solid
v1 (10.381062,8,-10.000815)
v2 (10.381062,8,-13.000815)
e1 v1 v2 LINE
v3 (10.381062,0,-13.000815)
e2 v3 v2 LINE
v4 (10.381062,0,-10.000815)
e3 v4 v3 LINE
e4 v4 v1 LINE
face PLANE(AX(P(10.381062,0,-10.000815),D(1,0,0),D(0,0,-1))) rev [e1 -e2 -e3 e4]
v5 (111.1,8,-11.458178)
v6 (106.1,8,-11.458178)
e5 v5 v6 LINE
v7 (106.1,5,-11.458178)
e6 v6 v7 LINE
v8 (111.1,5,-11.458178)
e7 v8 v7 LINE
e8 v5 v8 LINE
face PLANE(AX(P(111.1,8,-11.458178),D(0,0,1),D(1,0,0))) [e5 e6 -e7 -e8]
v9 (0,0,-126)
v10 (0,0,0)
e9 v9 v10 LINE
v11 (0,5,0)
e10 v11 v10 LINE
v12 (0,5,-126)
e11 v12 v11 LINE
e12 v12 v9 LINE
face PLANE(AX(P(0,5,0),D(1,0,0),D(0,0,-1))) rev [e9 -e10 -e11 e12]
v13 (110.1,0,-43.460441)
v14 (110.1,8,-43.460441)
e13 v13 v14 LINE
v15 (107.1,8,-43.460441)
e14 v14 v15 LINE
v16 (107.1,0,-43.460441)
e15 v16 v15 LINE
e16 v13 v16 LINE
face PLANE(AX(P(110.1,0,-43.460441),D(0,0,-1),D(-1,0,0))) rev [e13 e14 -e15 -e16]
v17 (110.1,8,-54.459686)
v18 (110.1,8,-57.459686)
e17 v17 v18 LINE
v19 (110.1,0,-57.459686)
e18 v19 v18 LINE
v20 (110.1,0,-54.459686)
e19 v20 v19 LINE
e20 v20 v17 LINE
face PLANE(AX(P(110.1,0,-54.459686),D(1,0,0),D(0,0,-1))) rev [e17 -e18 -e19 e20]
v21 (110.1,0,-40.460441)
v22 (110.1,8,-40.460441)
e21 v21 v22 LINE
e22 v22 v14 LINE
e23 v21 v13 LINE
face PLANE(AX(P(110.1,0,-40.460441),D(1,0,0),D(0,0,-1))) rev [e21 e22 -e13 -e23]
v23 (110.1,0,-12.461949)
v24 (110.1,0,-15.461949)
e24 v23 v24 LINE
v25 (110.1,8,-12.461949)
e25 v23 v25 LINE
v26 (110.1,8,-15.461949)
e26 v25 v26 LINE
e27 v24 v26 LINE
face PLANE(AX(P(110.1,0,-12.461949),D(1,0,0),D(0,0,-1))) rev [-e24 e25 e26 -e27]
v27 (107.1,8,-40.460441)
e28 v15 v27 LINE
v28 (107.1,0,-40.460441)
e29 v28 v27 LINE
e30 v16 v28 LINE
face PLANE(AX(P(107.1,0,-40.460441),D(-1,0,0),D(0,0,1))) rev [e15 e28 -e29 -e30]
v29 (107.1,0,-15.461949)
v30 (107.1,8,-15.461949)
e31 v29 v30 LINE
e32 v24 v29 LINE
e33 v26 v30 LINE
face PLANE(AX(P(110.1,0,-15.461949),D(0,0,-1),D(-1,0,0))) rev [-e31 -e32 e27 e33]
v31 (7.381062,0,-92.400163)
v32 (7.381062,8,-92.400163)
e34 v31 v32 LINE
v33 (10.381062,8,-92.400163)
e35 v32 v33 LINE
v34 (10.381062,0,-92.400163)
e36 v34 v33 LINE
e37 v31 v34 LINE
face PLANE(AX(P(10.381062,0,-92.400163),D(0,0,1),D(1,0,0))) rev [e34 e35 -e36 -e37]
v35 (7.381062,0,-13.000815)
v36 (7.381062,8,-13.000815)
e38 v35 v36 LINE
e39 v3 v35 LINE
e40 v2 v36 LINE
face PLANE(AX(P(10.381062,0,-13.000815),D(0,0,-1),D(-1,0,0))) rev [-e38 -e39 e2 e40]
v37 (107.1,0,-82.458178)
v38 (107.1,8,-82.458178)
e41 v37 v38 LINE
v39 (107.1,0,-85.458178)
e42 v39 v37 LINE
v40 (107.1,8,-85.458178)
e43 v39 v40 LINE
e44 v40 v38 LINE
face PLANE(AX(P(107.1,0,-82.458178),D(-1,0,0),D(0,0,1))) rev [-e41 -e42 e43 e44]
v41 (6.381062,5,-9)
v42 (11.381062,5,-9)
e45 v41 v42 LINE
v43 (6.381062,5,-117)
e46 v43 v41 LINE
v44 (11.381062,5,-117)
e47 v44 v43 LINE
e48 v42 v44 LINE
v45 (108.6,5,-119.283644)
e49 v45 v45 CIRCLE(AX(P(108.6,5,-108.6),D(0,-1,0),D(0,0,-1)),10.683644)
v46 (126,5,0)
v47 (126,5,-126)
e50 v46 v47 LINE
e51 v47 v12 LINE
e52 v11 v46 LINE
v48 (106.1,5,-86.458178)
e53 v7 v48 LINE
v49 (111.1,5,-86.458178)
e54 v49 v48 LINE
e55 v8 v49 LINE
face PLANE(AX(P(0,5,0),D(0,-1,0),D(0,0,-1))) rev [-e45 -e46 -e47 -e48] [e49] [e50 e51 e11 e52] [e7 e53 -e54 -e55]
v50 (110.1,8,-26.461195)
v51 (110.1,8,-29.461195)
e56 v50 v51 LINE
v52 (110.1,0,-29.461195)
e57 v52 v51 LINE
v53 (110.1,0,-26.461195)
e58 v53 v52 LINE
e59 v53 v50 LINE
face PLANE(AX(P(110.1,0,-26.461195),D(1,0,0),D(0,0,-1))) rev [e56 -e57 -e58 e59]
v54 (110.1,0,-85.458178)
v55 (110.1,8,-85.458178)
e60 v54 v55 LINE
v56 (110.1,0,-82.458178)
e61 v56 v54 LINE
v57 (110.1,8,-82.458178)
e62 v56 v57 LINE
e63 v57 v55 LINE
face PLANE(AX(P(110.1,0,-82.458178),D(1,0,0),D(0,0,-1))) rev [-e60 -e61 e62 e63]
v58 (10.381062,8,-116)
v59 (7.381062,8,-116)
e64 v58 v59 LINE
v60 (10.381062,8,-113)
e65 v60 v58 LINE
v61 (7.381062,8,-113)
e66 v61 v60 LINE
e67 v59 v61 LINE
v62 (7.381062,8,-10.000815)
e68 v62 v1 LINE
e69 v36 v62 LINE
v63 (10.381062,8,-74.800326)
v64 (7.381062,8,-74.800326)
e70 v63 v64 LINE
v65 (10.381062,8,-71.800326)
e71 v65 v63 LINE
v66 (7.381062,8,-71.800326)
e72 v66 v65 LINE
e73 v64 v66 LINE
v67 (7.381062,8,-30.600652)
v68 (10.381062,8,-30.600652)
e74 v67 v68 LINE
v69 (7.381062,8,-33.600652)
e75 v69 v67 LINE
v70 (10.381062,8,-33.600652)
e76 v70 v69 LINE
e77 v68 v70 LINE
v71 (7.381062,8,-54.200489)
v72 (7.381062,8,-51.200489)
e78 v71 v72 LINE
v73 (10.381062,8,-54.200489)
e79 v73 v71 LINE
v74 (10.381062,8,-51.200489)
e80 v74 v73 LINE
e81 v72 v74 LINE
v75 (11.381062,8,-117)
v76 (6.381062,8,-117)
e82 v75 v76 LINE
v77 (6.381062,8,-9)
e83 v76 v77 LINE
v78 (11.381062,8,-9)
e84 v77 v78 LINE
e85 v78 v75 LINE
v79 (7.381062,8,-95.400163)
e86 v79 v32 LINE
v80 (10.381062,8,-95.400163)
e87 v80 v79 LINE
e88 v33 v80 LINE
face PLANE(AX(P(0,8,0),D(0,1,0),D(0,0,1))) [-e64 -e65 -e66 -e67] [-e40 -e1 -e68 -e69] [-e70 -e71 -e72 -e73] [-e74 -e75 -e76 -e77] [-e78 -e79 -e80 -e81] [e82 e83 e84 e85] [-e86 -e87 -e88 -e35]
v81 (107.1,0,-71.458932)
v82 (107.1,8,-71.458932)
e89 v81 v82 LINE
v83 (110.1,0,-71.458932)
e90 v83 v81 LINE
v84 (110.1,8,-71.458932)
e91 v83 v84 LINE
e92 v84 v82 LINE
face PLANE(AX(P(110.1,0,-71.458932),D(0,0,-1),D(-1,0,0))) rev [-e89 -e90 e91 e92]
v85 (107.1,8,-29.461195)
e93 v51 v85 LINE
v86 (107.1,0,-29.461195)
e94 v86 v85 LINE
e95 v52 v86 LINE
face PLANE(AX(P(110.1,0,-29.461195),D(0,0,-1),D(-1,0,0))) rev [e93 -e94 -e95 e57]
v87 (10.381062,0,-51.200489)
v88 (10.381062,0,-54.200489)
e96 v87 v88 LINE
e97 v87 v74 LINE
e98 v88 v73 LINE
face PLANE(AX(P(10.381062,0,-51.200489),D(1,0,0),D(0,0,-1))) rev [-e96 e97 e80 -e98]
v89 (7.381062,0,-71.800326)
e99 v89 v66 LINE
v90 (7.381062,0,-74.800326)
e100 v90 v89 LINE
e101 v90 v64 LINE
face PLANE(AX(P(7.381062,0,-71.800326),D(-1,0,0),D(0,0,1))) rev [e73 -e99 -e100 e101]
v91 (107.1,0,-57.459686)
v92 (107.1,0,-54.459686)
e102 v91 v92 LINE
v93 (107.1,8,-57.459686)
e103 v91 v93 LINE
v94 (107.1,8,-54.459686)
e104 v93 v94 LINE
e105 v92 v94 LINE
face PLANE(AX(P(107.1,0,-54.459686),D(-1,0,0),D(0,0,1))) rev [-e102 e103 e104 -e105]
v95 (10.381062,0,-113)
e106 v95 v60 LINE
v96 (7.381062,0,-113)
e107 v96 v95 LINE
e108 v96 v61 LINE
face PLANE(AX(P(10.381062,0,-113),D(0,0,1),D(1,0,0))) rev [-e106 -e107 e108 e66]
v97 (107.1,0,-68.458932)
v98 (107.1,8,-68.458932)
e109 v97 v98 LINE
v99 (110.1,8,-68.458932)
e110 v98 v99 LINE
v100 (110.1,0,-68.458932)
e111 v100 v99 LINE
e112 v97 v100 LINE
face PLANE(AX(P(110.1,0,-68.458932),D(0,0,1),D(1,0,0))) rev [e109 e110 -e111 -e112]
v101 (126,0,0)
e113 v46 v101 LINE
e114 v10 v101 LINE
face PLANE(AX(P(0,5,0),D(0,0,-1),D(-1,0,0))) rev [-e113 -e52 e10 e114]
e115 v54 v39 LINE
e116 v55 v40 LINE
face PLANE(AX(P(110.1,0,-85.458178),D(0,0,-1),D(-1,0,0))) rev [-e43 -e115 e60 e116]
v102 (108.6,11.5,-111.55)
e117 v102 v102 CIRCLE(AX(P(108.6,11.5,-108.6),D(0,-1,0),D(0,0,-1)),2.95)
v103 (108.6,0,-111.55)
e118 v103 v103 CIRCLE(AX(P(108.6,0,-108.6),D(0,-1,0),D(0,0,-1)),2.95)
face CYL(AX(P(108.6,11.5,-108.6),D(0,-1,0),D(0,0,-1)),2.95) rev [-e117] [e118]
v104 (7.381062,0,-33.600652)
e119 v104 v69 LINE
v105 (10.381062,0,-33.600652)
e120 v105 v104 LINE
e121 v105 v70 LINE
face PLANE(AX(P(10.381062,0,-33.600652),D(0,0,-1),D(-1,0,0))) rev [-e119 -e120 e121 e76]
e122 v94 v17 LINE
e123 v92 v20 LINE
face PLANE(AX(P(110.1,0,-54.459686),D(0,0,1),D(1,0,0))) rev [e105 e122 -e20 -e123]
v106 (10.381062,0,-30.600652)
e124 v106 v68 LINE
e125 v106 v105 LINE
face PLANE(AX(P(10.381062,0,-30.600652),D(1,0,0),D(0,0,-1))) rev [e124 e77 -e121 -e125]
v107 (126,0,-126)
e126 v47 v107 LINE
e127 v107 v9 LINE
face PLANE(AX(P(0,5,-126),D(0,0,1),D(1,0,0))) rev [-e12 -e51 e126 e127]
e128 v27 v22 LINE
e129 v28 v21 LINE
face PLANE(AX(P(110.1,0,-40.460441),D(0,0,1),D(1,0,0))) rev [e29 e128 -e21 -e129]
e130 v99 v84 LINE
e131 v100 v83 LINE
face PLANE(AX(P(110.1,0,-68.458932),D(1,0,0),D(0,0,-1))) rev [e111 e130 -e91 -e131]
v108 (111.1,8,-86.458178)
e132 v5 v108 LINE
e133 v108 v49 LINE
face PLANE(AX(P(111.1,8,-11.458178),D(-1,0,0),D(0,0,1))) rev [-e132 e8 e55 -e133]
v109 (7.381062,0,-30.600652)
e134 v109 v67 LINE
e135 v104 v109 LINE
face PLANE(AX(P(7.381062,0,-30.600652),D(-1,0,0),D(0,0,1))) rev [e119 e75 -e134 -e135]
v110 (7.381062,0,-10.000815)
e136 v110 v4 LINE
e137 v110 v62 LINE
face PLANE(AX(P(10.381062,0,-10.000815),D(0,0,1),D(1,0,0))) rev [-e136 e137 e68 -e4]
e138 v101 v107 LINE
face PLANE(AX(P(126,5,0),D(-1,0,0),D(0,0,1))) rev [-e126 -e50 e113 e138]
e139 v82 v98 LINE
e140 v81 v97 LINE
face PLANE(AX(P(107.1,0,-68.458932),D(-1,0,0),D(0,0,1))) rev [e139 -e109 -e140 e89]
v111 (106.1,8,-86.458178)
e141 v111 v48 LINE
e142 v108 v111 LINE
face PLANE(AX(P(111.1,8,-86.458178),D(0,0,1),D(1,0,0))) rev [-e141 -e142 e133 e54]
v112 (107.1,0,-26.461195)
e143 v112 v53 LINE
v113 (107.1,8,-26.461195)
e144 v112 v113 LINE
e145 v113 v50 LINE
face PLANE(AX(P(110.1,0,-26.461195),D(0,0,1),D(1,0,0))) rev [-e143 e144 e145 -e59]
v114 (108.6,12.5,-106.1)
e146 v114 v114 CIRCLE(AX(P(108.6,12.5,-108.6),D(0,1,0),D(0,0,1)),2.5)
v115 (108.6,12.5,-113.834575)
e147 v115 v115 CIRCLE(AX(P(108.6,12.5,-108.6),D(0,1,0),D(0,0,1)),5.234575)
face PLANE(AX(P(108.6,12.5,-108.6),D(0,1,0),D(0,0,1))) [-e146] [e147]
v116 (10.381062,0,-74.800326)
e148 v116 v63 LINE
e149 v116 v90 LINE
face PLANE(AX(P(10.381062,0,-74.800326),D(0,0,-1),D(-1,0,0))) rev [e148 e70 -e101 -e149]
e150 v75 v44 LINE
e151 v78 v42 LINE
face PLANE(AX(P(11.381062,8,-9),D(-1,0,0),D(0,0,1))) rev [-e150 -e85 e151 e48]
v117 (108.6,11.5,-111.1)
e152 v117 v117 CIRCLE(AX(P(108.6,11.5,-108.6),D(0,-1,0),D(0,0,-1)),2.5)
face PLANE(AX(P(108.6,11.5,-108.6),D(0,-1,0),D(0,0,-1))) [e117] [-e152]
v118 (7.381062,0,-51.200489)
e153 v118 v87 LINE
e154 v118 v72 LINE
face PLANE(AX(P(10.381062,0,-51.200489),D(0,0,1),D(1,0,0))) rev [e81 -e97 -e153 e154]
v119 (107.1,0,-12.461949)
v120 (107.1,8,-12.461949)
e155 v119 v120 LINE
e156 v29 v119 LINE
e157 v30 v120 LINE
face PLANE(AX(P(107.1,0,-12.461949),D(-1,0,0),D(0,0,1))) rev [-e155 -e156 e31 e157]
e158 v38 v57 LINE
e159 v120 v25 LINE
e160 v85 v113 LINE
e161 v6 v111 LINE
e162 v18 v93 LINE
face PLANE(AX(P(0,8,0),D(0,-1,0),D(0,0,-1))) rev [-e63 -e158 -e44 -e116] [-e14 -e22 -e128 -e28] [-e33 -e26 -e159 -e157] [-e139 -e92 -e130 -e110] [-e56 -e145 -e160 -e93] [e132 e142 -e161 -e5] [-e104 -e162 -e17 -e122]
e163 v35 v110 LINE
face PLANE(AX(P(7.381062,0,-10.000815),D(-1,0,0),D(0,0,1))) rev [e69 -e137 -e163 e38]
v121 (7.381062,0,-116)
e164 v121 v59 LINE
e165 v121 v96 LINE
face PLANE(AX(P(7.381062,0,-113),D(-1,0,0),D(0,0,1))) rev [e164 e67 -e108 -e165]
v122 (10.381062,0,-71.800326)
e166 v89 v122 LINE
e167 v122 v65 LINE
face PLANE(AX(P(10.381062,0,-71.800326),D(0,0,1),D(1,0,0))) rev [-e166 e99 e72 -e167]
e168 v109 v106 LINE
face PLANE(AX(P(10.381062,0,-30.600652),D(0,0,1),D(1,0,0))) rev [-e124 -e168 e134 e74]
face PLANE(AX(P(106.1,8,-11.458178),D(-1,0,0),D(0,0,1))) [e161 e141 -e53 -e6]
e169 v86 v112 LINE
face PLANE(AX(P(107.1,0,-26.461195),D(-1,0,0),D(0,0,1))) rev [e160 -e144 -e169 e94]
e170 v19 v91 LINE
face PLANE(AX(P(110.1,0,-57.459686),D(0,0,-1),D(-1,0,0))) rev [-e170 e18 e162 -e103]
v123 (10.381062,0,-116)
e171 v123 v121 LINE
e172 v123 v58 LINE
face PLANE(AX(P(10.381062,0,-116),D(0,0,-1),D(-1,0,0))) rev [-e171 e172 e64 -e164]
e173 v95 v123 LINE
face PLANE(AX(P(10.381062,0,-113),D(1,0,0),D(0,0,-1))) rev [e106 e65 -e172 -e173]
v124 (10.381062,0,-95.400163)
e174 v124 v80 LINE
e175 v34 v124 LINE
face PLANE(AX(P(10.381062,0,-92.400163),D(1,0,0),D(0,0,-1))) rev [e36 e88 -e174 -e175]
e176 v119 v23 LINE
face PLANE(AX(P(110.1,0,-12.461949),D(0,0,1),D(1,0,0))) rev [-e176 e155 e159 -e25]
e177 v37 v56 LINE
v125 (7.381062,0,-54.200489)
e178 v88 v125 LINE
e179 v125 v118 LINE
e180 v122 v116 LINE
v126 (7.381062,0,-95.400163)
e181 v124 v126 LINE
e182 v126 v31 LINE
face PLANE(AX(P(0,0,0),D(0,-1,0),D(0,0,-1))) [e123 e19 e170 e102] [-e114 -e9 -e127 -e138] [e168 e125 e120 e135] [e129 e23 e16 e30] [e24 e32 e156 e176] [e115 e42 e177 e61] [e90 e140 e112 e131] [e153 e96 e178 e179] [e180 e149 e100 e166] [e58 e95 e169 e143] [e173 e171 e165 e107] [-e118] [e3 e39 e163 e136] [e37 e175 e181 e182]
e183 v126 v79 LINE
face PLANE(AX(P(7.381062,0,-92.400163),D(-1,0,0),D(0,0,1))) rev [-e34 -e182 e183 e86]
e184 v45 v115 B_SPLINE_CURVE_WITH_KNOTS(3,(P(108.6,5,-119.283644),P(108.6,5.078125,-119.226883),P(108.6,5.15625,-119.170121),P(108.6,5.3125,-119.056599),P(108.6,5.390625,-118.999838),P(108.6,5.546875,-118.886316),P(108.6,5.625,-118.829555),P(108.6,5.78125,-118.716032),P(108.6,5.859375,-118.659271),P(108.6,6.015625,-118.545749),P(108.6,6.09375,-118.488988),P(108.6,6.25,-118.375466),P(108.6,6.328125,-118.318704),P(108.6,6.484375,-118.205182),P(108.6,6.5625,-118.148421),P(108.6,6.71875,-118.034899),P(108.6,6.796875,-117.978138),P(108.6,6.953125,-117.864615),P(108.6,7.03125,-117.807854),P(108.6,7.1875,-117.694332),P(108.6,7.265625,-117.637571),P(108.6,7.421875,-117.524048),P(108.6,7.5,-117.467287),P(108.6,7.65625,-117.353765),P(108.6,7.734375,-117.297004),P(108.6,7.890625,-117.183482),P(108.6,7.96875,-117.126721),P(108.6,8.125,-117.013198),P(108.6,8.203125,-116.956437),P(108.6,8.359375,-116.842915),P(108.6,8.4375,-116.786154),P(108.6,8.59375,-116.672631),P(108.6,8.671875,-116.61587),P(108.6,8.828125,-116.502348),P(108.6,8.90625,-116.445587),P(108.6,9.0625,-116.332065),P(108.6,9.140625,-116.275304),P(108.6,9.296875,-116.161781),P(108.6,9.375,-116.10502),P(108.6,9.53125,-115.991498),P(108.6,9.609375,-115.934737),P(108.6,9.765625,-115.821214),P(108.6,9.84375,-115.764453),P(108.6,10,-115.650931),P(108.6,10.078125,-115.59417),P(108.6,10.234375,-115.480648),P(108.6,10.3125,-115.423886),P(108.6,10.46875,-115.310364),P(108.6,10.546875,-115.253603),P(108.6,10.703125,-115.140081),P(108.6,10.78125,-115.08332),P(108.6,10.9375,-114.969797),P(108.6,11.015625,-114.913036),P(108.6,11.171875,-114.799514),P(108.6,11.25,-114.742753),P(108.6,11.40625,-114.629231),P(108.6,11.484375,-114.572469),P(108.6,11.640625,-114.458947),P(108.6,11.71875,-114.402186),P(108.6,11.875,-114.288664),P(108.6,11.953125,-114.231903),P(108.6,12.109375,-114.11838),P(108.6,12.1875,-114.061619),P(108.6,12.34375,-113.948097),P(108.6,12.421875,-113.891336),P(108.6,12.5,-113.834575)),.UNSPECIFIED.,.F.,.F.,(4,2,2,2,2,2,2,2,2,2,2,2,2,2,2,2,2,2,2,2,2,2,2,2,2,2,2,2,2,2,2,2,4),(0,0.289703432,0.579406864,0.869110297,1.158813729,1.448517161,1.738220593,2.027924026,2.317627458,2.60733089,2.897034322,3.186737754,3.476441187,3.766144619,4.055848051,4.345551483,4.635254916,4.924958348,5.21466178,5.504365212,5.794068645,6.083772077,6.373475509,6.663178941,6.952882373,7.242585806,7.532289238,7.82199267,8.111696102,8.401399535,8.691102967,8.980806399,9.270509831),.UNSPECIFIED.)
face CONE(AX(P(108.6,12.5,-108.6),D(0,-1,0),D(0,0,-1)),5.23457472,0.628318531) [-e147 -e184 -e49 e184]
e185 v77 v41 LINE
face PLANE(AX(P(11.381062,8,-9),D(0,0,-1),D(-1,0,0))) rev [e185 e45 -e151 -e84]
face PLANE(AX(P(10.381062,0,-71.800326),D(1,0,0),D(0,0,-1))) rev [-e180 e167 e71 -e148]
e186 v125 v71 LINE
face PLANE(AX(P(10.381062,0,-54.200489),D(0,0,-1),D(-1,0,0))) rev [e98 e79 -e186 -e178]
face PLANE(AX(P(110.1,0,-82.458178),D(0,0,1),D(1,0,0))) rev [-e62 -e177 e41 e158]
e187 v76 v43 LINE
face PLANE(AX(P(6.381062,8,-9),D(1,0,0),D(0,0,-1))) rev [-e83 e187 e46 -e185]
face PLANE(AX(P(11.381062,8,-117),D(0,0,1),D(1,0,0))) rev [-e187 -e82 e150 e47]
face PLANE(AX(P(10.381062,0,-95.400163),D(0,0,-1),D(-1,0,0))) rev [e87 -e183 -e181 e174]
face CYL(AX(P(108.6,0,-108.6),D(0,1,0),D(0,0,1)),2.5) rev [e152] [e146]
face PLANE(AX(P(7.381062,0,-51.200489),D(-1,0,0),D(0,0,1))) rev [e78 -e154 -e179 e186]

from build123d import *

# Parameters (mm, degrees)
SKETCH1_W           = 126
SKETCH1_H           = 126
BOSS_EXTRUDE1_DEPTH = 5
SKETCH3_R           = 12.5
BOSS_EXTRUDE2_DEPTH = 7.5
SKETCH4_R           = 2.95
CUT_EXTRUDE1_DEPTH  = 11.5
SKETCH6_R           = 2.5
CUT_EXTRUDE2_DEPTH  = 179.628805068
CHAMFER1_SIZE       = 10
CHAMFER1_SIZE_2     = 7.26542528
SKETCH9_W           = 5
SKETCH9_H           = 75
BOSS_EXTRUDE4_DEPTH = 3
SKETCH10_W          = 3
SKETCH10_H          = 3
CUT_EXTRUDE4_DEPTH  = 179.370401132
SKETCH11_W          = 5
SKETCH11_H          = 108
BOSS_EXTRUDE5_DEPTH = 3
SKETCH12_W          = 3
SKETCH12_H          = 3
CUT_EXTRUDE5_DEPTH  = 179.370401132


with BuildPart() as part:
    # Sketch1 → Boss-Extrude1 (new body)
    with BuildSketch(Plane(origin=(0, 0, 0), x_dir=(1, 0, 0), z_dir=(0, 1, 0))):
        with Locations((63, 63)):
            Rectangle(SKETCH1_W, SKETCH1_H)
    extrude(amount=BOSS_EXTRUDE1_DEPTH)

    # Sketch3 → Boss-Extrude2 (add)
    with BuildSketch(Plane(origin=(0, 5, 0), x_dir=(1, 0, 0), z_dir=(0, 1, 0))):
        with Locations(Location((108.6, 108.6, 0), (0, 0, 90))):
            Circle(SKETCH3_R)
    extrude(amount=BOSS_EXTRUDE2_DEPTH)

    # Sketch4 → Cut-Extrude1 (cut)
    with BuildSketch(Plane.XZ):
        with Locations(Location((108.6, -108.6, 0), (0, 0, 270))):
            Circle(SKETCH4_R)
    extrude(amount=-CUT_EXTRUDE1_DEPTH, mode=Mode.SUBTRACT)

    # Sketch6 → Cut-Extrude2 (cut, through all)
    with BuildSketch(Plane(origin=(0, 12.5, 0), x_dir=(1, 0, 0), z_dir=(0, 1, 0))):
        with Locations(Location((108.6, 108.6, 0), (0, 0, 270))):
            Circle(SKETCH6_R)
    extrude(amount=-CUT_EXTRUDE2_DEPTH, mode=Mode.SUBTRACT)

    # Chamfer1
    # the kernel refuses this chamfer: 10, 7.26542528 mm, written as the material it takes off along each edge
    with BuildSketch(Plane(origin=(108.6, 12.5, -108.6), x_dir=(0, 0, -1), z_dir=(1, 0, 0))) as chamfer1_piece_1_section:
        Polygon((12.5, -CHAMFER1_SIZE), (12.5 - CHAMFER1_SIZE_2, 0), (12.5, 0), align=None)
    chamfer1_piece_1 = revolve(axis=Axis((108.6, 12.5, -108.6), (0, 1, 0)), mode=Mode.PRIVATE)
    chamfer1_piece_1 = split(chamfer1_piece_1, bisect_by=Plane(origin=(108.6, 5, -100.650989912), z_dir=(0, 1, 0)), keep=Keep.TOP, mode=Mode.PRIVATE)
    add(chamfer1_piece_1, mode=Mode.SUBTRACT)

    # Sketch9 → Boss-Extrude4 (add)
    with BuildSketch(Plane(origin=(0, 5, 0), x_dir=(1, 0, 0), z_dir=(0, 1, 0))):
        with Locations((108.6, 48.95817816)):
            Rectangle(SKETCH9_W, SKETCH9_H)
    extrude(amount=BOSS_EXTRUDE4_DEPTH)

    # Sketch10 → Cut-Extrude4 (cut, through all)
    with BuildSketch(Plane(origin=(0, 8, 0), x_dir=(1, 0, 0), z_dir=(0, 1, 0))):
        with Locations((108.6, 83.95817816)):
            Rectangle(SKETCH10_W, SKETCH10_H)
        with Locations((108.6, 69.958932274)):
            Rectangle(SKETCH10_W, SKETCH10_H)
        with Locations((108.6, 55.959686388)):
            Rectangle(SKETCH10_W, SKETCH10_H)
        with Locations((108.6, 41.960440502)):
            Rectangle(SKETCH10_W, SKETCH10_H)
        with Locations((108.6, 27.961194616)):
            Rectangle(SKETCH10_W, SKETCH10_H)
        with Locations((108.6, 13.96194873)):
            Rectangle(SKETCH10_W, SKETCH10_H)
    extrude(amount=-CUT_EXTRUDE4_DEPTH, mode=Mode.SUBTRACT)

    # Sketch11 → Boss-Extrude5 (add)
    with BuildSketch(Plane(origin=(0, 5, 0), x_dir=(1, 0, 0), z_dir=(0, 1, 0))):
        with Locations((8.881061813, 63)):
            Rectangle(SKETCH11_W, SKETCH11_H)
    extrude(amount=BOSS_EXTRUDE5_DEPTH)

    # Sketch12 → Cut-Extrude5 (cut, through all)
    with BuildSketch(Plane(origin=(0, 8, 0), x_dir=(1, 0, 0), z_dir=(0, 1, 0))):
        with Locations((8.881061813, 114.5)):
            Rectangle(SKETCH12_W, SKETCH12_H)
        with Locations((8.881061813, 93.900163021)):
            Rectangle(SKETCH12_W, SKETCH12_H)
        with Locations((8.881061813, 73.300326041)):
            Rectangle(SKETCH12_W, SKETCH12_H)
        with Locations((8.881061813, 52.700489062)):
            Rectangle(SKETCH12_W, SKETCH12_H)
        with Locations((8.881061813, 32.100652082)):
            Rectangle(SKETCH12_W, SKETCH12_H)
        with Locations((8.881061813, 11.500815103)):
            Rectangle(SKETCH12_W, SKETCH12_H)
    extrude(amount=-CUT_EXTRUDE5_DEPTH, mode=Mode.SUBTRACT)


solid = part.part
